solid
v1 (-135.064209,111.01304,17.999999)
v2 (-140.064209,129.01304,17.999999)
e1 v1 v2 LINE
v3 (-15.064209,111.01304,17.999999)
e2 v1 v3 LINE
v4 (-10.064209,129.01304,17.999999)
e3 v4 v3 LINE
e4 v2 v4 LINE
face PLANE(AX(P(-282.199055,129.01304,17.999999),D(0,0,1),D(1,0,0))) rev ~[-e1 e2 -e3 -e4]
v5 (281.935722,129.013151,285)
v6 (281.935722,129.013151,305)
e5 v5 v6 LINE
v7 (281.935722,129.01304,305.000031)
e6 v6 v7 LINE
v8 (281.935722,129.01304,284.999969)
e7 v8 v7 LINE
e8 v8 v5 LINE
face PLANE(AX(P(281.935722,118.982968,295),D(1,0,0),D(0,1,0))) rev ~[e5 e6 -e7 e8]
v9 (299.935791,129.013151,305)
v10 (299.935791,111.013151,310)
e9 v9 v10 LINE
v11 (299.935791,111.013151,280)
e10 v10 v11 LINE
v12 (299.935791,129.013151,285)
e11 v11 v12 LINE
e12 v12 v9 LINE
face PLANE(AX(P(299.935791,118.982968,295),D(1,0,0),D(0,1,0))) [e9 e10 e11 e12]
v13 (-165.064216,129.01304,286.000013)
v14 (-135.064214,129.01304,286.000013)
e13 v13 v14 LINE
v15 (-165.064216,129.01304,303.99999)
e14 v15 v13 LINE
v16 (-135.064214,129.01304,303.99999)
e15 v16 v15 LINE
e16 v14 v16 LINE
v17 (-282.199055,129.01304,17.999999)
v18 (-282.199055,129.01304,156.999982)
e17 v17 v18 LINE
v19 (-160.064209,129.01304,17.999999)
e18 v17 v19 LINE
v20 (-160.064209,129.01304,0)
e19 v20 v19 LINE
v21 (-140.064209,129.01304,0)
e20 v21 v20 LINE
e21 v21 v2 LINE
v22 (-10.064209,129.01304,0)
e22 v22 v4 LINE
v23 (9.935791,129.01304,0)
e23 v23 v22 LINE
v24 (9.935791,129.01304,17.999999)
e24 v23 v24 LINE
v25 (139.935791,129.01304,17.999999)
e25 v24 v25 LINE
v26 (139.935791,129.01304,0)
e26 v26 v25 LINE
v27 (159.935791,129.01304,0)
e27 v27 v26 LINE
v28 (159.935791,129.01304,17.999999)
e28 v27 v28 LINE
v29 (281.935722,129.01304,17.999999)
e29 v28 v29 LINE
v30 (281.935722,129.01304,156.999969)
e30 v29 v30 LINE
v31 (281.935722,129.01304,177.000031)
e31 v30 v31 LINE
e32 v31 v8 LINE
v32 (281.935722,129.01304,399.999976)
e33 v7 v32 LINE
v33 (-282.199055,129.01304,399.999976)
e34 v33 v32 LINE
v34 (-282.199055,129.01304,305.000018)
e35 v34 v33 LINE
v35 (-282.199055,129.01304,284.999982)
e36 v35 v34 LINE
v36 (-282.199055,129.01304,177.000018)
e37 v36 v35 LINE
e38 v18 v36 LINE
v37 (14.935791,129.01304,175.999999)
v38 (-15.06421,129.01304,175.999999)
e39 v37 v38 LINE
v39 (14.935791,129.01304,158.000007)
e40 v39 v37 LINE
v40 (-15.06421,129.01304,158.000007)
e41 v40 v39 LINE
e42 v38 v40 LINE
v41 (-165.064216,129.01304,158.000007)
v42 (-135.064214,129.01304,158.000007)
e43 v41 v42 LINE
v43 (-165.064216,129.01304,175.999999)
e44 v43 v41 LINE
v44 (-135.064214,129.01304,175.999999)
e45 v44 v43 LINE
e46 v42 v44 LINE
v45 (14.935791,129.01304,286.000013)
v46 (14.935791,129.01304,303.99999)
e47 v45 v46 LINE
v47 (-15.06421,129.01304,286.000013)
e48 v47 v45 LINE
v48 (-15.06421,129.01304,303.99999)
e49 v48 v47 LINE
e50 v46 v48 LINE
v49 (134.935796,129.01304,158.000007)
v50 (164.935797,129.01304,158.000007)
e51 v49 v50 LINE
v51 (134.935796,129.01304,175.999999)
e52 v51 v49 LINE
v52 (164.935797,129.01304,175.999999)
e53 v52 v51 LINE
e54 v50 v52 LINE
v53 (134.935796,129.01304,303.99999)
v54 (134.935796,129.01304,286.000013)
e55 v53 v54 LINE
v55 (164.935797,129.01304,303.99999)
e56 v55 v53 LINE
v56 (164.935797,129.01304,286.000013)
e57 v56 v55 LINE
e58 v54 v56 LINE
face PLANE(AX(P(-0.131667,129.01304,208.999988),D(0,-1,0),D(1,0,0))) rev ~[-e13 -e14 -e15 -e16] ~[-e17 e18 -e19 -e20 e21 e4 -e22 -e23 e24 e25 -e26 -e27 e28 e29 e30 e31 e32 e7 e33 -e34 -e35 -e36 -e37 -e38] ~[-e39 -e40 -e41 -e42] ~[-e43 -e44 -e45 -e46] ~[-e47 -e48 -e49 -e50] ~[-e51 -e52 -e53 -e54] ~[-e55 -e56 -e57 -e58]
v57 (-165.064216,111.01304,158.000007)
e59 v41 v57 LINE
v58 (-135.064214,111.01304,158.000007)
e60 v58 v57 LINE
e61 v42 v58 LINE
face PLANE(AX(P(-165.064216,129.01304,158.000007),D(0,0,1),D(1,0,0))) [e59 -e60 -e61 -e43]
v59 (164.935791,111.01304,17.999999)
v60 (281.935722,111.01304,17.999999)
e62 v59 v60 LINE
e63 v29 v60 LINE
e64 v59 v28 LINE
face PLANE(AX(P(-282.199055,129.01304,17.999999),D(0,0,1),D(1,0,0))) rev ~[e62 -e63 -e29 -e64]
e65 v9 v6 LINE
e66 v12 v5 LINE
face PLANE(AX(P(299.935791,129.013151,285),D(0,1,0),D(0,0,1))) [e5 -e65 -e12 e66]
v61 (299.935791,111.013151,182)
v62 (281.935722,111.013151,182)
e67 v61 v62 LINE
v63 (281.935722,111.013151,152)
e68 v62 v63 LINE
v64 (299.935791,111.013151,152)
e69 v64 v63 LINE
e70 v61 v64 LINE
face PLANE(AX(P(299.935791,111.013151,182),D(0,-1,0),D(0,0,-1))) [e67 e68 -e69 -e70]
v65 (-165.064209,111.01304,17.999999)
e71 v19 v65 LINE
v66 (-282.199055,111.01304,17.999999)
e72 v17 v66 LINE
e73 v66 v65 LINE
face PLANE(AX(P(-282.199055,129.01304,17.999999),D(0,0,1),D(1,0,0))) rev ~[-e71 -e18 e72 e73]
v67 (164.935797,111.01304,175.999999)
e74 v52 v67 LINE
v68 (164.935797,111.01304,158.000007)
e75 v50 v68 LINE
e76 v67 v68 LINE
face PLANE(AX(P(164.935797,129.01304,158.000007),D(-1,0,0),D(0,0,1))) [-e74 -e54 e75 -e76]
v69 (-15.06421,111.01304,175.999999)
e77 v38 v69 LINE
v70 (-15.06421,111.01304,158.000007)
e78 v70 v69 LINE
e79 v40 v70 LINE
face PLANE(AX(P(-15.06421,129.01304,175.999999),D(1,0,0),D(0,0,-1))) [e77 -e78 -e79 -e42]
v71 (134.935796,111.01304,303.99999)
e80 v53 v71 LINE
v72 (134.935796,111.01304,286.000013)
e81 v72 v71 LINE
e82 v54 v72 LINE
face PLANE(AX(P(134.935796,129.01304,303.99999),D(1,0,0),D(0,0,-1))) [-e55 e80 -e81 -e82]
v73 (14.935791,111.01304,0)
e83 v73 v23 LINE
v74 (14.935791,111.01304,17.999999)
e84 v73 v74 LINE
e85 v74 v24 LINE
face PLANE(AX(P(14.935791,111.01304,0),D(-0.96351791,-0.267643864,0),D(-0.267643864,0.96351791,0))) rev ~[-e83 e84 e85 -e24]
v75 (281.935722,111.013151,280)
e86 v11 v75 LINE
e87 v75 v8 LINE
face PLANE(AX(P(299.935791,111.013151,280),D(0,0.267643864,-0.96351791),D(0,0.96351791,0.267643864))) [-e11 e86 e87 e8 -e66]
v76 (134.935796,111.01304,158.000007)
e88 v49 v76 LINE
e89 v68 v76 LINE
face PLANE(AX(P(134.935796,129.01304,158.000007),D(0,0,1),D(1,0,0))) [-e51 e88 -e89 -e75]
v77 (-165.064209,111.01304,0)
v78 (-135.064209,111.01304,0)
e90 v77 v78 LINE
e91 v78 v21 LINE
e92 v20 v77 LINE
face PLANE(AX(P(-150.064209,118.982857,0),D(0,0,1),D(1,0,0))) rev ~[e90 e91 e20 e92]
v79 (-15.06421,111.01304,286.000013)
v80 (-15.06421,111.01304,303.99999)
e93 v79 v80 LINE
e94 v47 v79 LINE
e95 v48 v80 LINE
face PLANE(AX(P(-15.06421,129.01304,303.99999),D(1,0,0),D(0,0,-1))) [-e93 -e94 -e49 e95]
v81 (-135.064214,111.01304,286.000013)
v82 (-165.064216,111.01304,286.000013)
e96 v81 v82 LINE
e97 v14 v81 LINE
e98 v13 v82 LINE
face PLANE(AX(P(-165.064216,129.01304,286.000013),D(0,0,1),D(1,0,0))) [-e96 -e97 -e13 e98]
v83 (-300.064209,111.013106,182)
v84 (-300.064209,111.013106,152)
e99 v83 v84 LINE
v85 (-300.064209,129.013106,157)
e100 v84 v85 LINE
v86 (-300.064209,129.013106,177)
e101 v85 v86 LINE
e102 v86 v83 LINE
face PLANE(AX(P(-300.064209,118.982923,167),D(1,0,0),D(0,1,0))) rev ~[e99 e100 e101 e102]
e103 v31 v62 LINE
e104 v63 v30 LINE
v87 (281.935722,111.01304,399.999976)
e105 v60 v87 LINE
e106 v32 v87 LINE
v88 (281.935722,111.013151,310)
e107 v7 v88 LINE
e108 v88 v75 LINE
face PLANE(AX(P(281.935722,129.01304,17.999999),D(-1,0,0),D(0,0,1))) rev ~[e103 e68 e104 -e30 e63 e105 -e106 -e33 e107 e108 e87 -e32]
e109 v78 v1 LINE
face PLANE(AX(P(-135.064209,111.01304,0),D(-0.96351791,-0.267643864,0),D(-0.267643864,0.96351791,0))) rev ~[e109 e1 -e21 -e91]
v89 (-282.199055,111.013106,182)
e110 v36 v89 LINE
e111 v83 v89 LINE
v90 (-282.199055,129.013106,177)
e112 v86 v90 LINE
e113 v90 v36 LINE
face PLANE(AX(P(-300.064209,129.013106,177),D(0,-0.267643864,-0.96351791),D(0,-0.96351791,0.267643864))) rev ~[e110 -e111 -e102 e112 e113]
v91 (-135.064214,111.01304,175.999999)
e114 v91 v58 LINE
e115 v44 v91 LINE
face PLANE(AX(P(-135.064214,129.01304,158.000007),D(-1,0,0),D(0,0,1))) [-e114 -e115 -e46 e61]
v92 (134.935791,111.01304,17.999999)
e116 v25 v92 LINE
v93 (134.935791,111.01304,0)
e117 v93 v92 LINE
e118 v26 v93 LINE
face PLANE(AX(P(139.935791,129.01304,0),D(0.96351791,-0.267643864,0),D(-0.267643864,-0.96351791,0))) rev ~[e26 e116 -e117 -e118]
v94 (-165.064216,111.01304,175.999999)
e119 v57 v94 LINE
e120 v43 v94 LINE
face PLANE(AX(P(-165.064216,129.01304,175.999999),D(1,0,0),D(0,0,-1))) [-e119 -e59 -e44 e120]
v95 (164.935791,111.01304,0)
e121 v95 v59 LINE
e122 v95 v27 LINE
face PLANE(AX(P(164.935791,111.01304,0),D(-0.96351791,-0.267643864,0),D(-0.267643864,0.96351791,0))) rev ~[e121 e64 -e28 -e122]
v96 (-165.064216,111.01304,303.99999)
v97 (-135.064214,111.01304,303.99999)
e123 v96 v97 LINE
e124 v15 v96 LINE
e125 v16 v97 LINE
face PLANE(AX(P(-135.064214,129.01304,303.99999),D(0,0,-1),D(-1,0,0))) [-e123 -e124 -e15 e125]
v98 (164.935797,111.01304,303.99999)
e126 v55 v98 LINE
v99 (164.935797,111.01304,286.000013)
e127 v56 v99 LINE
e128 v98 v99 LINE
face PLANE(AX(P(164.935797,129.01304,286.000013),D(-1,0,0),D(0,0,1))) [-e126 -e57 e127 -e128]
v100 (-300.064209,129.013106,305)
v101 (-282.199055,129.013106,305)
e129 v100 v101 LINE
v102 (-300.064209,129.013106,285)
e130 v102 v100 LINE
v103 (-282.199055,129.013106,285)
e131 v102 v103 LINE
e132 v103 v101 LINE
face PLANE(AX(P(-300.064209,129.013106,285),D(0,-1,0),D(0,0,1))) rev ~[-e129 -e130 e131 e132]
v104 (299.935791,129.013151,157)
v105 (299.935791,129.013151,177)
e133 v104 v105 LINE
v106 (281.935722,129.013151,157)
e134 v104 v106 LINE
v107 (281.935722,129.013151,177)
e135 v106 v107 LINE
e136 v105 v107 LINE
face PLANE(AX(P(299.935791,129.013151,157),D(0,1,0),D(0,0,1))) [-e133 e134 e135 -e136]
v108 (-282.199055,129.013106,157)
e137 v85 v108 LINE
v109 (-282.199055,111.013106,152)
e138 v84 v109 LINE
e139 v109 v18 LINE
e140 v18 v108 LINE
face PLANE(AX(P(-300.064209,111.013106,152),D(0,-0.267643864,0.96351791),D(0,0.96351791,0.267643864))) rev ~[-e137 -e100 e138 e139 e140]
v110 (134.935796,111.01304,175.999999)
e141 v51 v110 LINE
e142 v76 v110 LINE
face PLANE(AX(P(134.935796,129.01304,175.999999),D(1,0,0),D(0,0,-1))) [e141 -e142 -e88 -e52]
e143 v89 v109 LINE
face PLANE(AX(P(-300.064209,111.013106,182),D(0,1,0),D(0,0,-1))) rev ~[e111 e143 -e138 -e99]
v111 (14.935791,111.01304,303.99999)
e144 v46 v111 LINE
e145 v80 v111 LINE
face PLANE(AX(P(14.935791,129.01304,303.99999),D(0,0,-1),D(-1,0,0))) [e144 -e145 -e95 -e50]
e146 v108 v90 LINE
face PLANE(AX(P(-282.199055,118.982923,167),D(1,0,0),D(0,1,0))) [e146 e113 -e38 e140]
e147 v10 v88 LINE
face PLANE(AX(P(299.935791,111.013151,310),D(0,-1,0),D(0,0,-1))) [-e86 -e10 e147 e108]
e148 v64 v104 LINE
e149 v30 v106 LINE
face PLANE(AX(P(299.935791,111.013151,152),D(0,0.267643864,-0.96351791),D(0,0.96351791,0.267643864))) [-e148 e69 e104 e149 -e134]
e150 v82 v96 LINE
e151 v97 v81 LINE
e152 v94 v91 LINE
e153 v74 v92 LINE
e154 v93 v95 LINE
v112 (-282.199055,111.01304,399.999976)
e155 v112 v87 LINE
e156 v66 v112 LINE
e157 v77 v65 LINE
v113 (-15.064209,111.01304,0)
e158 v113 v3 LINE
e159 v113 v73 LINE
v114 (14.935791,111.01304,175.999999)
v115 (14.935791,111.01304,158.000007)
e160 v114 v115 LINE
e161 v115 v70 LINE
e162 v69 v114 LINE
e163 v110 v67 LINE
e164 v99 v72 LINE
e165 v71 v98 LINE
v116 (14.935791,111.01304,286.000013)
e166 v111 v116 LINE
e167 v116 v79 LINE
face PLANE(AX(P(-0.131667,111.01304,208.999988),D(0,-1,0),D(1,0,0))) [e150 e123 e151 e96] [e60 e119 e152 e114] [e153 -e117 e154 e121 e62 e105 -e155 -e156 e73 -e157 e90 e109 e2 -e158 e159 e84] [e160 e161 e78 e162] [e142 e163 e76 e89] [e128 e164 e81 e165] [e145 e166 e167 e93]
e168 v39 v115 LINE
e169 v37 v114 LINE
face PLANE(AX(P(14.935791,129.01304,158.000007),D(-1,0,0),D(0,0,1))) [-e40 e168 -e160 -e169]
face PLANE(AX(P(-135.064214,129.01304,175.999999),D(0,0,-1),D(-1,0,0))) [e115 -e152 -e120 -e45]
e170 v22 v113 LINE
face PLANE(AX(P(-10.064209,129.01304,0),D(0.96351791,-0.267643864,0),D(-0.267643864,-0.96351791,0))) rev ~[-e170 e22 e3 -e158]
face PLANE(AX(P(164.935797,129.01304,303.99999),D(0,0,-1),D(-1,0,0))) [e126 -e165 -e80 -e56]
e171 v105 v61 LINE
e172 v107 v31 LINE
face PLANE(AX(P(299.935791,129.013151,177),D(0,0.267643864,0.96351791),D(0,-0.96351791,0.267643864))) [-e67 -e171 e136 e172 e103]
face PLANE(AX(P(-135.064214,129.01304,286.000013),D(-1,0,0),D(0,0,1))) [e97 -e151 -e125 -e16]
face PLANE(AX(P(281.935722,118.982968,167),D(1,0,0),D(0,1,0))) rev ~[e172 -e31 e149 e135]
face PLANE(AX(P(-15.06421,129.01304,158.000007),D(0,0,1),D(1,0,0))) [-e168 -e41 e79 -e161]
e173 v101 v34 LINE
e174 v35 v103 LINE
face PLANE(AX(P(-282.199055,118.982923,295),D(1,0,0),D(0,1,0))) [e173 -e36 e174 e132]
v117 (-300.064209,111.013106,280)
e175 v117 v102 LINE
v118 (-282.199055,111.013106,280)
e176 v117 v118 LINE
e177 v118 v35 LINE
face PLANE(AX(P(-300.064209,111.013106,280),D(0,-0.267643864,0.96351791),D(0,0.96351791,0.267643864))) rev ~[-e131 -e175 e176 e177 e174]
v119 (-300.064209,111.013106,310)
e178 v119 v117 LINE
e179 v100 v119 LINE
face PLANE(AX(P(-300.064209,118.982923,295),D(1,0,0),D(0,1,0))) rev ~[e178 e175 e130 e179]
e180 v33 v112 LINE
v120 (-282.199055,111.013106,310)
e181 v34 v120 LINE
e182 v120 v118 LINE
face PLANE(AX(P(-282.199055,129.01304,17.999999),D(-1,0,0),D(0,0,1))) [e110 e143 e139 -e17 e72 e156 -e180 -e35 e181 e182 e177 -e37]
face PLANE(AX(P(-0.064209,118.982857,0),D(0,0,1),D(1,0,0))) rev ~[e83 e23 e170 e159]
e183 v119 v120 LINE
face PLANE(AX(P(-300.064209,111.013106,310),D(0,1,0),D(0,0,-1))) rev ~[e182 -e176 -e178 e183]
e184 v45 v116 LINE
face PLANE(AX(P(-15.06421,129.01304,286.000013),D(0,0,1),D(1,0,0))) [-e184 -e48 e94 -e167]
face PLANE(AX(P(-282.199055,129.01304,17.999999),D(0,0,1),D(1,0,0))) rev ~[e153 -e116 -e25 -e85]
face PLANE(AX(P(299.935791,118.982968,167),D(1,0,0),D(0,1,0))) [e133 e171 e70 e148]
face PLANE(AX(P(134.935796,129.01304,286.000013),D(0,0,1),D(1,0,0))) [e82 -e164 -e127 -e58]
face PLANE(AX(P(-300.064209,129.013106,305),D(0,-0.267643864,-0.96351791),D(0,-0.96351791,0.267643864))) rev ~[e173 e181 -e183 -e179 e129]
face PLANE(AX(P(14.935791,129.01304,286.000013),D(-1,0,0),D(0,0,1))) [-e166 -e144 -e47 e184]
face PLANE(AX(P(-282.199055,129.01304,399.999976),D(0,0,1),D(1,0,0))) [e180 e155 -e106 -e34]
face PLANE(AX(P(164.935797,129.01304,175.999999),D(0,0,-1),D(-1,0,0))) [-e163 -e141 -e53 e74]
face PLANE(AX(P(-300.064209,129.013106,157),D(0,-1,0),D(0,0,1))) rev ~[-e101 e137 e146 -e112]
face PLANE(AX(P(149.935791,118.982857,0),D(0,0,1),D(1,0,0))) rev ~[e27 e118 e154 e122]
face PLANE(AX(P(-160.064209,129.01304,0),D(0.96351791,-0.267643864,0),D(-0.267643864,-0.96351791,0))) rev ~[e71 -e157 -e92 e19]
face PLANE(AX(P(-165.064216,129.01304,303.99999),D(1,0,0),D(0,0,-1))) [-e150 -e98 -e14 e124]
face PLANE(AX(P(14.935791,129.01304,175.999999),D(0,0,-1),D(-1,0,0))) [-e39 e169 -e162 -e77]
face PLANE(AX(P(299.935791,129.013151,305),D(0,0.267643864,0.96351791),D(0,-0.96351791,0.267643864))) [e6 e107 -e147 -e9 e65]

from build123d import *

# Parameters (mm, degrees)
F4_W      = 564.1347765923
F4_H      = 381.999976933
F5_DEPTH  = 18
F6_DEPTH  = 17.9999992251
F7_DEPTH  = 18.0000689332
F10_DEPTH = 17.8651544745
F12_DEPTH = 25


with BuildPart() as f5:
    # F4 (on plane+point) → F5 (new body)
    with BuildSketch(Plane.XZ.offset(-129.0130399809)):
        with Locations((-0.1316666603, 208.9999876916)):
            Rectangle(F4_W, F4_H)
    extrude(amount=F5_DEPTH)

    # F0 (on Top) → F6 (join, through all)
    with BuildSketch(Plane.XY):
        Polygon((149.935790569, 129.0130399809), (139.935790569, 129.0130399809), (134.935790569, 111.0130399809), (164.935790569, 111.0130399809), (159.935790569, 129.0130399809), align=None)
        Polygon((-0.064209431, 129.0130399809), (-10.064209431, 129.0130399809), (-15.064209431, 111.0130399809), (-0.064209431, 111.0130399809), (14.935790569, 111.0130399809), (9.935790569, 129.0130399809), align=None)
        Polygon((-150.064209431, 129.0130399809), (-160.064209431, 129.0130399809), (-165.064209431, 111.0130399809), (-135.064209431, 111.0130399809), (-140.064209431, 129.0130399809), align=None)
    extrude(amount=F6_DEPTH)

    # F3 (on plane+point) → F7 (join, through all)
    with BuildSketch(Plane.YZ.offset(299.935790569)):
        Polygon((111.0131509304, 152), (129.0131509304, 157), (129.0131509304, 177), (111.0131509304, 182), align=None)
        Polygon((129.0131509304, 295), (129.0131509304, 305), (111.0131509304, 310), (111.0131509304, 295), (111.0131509304, 280), (129.0131509304, 285), align=None)
    extrude(amount=-F7_DEPTH)

    # F9 (on offset) → F10 (join, through all)
    with BuildSketch(Plane.YZ.offset(-300.064209431)):
        Polygon((129.0131062269, 295), (129.0131062269, 305), (111.0131062269, 310), (111.0131062269, 295), (111.0131062269, 280), (129.0131062269, 285), align=None)
        Polygon((111.0131062269, 152), (129.0131062269, 157), (129.0131062269, 177), (111.0131062269, 182), align=None)
    extrude(amount=F10_DEPTH)

    # F11 (on plane+point) → F12 (cut)
    with BuildSketch(Plane.XZ.offset(-129.0130399809)):
        Polygon((164.9357974529, 167), (164.9357974529, 175.9999990463), (149.935790569, 175.9999990463), (134.9357962608, 175.9999990463), (134.9357962608, 167), (134.9357962608, 158.0000072718), (149.935790569, 158.0000072718), (164.9357974529, 158.0000072718), align=None)
        Polygon((149.935790569, 286.0000133514), (164.9357974529, 286.0000133514), (164.9357974529, 295), (164.9357974529, 303.9999902248), (149.935790569, 303.9999902248), (134.9357962608, 303.9999902248), (134.9357962608, 295), (134.9357962608, 286.0000133514), align=None)
        Polygon((14.9357905611, 167), (14.9357905611, 175.9999990463), (-15.0642096996, 175.9999990463), (-15.0642096996, 167), (-15.0642096996, 158.0000072718), (14.9357905611, 158.0000072718), align=None)
        Polygon((-15.0642096996, 286.0000133514), (14.9357905611, 286.0000133514), (14.9357905611, 295), (14.9357905611, 303.9999902248), (-15.0642096996, 303.9999902248), (-15.0642096996, 295), align=None)
        Polygon((-135.064214468, 167), (-135.064214468, 175.9999990463), (-165.0642156601, 175.9999990463), (-165.0642156601, 167), (-165.0642156601, 158.0000072718), (-135.064214468, 158.0000072718), align=None)
        Polygon((-165.0642156601, 286.0000133514), (-135.064214468, 286.0000133514), (-135.064214468, 295), (-135.064214468, 303.9999902248), (-165.0642156601, 303.9999902248), (-165.0642156601, 295), align=None)
    extrude(amount=F12_DEPTH, mode=Mode.SUBTRACT)


solid = f5.part
